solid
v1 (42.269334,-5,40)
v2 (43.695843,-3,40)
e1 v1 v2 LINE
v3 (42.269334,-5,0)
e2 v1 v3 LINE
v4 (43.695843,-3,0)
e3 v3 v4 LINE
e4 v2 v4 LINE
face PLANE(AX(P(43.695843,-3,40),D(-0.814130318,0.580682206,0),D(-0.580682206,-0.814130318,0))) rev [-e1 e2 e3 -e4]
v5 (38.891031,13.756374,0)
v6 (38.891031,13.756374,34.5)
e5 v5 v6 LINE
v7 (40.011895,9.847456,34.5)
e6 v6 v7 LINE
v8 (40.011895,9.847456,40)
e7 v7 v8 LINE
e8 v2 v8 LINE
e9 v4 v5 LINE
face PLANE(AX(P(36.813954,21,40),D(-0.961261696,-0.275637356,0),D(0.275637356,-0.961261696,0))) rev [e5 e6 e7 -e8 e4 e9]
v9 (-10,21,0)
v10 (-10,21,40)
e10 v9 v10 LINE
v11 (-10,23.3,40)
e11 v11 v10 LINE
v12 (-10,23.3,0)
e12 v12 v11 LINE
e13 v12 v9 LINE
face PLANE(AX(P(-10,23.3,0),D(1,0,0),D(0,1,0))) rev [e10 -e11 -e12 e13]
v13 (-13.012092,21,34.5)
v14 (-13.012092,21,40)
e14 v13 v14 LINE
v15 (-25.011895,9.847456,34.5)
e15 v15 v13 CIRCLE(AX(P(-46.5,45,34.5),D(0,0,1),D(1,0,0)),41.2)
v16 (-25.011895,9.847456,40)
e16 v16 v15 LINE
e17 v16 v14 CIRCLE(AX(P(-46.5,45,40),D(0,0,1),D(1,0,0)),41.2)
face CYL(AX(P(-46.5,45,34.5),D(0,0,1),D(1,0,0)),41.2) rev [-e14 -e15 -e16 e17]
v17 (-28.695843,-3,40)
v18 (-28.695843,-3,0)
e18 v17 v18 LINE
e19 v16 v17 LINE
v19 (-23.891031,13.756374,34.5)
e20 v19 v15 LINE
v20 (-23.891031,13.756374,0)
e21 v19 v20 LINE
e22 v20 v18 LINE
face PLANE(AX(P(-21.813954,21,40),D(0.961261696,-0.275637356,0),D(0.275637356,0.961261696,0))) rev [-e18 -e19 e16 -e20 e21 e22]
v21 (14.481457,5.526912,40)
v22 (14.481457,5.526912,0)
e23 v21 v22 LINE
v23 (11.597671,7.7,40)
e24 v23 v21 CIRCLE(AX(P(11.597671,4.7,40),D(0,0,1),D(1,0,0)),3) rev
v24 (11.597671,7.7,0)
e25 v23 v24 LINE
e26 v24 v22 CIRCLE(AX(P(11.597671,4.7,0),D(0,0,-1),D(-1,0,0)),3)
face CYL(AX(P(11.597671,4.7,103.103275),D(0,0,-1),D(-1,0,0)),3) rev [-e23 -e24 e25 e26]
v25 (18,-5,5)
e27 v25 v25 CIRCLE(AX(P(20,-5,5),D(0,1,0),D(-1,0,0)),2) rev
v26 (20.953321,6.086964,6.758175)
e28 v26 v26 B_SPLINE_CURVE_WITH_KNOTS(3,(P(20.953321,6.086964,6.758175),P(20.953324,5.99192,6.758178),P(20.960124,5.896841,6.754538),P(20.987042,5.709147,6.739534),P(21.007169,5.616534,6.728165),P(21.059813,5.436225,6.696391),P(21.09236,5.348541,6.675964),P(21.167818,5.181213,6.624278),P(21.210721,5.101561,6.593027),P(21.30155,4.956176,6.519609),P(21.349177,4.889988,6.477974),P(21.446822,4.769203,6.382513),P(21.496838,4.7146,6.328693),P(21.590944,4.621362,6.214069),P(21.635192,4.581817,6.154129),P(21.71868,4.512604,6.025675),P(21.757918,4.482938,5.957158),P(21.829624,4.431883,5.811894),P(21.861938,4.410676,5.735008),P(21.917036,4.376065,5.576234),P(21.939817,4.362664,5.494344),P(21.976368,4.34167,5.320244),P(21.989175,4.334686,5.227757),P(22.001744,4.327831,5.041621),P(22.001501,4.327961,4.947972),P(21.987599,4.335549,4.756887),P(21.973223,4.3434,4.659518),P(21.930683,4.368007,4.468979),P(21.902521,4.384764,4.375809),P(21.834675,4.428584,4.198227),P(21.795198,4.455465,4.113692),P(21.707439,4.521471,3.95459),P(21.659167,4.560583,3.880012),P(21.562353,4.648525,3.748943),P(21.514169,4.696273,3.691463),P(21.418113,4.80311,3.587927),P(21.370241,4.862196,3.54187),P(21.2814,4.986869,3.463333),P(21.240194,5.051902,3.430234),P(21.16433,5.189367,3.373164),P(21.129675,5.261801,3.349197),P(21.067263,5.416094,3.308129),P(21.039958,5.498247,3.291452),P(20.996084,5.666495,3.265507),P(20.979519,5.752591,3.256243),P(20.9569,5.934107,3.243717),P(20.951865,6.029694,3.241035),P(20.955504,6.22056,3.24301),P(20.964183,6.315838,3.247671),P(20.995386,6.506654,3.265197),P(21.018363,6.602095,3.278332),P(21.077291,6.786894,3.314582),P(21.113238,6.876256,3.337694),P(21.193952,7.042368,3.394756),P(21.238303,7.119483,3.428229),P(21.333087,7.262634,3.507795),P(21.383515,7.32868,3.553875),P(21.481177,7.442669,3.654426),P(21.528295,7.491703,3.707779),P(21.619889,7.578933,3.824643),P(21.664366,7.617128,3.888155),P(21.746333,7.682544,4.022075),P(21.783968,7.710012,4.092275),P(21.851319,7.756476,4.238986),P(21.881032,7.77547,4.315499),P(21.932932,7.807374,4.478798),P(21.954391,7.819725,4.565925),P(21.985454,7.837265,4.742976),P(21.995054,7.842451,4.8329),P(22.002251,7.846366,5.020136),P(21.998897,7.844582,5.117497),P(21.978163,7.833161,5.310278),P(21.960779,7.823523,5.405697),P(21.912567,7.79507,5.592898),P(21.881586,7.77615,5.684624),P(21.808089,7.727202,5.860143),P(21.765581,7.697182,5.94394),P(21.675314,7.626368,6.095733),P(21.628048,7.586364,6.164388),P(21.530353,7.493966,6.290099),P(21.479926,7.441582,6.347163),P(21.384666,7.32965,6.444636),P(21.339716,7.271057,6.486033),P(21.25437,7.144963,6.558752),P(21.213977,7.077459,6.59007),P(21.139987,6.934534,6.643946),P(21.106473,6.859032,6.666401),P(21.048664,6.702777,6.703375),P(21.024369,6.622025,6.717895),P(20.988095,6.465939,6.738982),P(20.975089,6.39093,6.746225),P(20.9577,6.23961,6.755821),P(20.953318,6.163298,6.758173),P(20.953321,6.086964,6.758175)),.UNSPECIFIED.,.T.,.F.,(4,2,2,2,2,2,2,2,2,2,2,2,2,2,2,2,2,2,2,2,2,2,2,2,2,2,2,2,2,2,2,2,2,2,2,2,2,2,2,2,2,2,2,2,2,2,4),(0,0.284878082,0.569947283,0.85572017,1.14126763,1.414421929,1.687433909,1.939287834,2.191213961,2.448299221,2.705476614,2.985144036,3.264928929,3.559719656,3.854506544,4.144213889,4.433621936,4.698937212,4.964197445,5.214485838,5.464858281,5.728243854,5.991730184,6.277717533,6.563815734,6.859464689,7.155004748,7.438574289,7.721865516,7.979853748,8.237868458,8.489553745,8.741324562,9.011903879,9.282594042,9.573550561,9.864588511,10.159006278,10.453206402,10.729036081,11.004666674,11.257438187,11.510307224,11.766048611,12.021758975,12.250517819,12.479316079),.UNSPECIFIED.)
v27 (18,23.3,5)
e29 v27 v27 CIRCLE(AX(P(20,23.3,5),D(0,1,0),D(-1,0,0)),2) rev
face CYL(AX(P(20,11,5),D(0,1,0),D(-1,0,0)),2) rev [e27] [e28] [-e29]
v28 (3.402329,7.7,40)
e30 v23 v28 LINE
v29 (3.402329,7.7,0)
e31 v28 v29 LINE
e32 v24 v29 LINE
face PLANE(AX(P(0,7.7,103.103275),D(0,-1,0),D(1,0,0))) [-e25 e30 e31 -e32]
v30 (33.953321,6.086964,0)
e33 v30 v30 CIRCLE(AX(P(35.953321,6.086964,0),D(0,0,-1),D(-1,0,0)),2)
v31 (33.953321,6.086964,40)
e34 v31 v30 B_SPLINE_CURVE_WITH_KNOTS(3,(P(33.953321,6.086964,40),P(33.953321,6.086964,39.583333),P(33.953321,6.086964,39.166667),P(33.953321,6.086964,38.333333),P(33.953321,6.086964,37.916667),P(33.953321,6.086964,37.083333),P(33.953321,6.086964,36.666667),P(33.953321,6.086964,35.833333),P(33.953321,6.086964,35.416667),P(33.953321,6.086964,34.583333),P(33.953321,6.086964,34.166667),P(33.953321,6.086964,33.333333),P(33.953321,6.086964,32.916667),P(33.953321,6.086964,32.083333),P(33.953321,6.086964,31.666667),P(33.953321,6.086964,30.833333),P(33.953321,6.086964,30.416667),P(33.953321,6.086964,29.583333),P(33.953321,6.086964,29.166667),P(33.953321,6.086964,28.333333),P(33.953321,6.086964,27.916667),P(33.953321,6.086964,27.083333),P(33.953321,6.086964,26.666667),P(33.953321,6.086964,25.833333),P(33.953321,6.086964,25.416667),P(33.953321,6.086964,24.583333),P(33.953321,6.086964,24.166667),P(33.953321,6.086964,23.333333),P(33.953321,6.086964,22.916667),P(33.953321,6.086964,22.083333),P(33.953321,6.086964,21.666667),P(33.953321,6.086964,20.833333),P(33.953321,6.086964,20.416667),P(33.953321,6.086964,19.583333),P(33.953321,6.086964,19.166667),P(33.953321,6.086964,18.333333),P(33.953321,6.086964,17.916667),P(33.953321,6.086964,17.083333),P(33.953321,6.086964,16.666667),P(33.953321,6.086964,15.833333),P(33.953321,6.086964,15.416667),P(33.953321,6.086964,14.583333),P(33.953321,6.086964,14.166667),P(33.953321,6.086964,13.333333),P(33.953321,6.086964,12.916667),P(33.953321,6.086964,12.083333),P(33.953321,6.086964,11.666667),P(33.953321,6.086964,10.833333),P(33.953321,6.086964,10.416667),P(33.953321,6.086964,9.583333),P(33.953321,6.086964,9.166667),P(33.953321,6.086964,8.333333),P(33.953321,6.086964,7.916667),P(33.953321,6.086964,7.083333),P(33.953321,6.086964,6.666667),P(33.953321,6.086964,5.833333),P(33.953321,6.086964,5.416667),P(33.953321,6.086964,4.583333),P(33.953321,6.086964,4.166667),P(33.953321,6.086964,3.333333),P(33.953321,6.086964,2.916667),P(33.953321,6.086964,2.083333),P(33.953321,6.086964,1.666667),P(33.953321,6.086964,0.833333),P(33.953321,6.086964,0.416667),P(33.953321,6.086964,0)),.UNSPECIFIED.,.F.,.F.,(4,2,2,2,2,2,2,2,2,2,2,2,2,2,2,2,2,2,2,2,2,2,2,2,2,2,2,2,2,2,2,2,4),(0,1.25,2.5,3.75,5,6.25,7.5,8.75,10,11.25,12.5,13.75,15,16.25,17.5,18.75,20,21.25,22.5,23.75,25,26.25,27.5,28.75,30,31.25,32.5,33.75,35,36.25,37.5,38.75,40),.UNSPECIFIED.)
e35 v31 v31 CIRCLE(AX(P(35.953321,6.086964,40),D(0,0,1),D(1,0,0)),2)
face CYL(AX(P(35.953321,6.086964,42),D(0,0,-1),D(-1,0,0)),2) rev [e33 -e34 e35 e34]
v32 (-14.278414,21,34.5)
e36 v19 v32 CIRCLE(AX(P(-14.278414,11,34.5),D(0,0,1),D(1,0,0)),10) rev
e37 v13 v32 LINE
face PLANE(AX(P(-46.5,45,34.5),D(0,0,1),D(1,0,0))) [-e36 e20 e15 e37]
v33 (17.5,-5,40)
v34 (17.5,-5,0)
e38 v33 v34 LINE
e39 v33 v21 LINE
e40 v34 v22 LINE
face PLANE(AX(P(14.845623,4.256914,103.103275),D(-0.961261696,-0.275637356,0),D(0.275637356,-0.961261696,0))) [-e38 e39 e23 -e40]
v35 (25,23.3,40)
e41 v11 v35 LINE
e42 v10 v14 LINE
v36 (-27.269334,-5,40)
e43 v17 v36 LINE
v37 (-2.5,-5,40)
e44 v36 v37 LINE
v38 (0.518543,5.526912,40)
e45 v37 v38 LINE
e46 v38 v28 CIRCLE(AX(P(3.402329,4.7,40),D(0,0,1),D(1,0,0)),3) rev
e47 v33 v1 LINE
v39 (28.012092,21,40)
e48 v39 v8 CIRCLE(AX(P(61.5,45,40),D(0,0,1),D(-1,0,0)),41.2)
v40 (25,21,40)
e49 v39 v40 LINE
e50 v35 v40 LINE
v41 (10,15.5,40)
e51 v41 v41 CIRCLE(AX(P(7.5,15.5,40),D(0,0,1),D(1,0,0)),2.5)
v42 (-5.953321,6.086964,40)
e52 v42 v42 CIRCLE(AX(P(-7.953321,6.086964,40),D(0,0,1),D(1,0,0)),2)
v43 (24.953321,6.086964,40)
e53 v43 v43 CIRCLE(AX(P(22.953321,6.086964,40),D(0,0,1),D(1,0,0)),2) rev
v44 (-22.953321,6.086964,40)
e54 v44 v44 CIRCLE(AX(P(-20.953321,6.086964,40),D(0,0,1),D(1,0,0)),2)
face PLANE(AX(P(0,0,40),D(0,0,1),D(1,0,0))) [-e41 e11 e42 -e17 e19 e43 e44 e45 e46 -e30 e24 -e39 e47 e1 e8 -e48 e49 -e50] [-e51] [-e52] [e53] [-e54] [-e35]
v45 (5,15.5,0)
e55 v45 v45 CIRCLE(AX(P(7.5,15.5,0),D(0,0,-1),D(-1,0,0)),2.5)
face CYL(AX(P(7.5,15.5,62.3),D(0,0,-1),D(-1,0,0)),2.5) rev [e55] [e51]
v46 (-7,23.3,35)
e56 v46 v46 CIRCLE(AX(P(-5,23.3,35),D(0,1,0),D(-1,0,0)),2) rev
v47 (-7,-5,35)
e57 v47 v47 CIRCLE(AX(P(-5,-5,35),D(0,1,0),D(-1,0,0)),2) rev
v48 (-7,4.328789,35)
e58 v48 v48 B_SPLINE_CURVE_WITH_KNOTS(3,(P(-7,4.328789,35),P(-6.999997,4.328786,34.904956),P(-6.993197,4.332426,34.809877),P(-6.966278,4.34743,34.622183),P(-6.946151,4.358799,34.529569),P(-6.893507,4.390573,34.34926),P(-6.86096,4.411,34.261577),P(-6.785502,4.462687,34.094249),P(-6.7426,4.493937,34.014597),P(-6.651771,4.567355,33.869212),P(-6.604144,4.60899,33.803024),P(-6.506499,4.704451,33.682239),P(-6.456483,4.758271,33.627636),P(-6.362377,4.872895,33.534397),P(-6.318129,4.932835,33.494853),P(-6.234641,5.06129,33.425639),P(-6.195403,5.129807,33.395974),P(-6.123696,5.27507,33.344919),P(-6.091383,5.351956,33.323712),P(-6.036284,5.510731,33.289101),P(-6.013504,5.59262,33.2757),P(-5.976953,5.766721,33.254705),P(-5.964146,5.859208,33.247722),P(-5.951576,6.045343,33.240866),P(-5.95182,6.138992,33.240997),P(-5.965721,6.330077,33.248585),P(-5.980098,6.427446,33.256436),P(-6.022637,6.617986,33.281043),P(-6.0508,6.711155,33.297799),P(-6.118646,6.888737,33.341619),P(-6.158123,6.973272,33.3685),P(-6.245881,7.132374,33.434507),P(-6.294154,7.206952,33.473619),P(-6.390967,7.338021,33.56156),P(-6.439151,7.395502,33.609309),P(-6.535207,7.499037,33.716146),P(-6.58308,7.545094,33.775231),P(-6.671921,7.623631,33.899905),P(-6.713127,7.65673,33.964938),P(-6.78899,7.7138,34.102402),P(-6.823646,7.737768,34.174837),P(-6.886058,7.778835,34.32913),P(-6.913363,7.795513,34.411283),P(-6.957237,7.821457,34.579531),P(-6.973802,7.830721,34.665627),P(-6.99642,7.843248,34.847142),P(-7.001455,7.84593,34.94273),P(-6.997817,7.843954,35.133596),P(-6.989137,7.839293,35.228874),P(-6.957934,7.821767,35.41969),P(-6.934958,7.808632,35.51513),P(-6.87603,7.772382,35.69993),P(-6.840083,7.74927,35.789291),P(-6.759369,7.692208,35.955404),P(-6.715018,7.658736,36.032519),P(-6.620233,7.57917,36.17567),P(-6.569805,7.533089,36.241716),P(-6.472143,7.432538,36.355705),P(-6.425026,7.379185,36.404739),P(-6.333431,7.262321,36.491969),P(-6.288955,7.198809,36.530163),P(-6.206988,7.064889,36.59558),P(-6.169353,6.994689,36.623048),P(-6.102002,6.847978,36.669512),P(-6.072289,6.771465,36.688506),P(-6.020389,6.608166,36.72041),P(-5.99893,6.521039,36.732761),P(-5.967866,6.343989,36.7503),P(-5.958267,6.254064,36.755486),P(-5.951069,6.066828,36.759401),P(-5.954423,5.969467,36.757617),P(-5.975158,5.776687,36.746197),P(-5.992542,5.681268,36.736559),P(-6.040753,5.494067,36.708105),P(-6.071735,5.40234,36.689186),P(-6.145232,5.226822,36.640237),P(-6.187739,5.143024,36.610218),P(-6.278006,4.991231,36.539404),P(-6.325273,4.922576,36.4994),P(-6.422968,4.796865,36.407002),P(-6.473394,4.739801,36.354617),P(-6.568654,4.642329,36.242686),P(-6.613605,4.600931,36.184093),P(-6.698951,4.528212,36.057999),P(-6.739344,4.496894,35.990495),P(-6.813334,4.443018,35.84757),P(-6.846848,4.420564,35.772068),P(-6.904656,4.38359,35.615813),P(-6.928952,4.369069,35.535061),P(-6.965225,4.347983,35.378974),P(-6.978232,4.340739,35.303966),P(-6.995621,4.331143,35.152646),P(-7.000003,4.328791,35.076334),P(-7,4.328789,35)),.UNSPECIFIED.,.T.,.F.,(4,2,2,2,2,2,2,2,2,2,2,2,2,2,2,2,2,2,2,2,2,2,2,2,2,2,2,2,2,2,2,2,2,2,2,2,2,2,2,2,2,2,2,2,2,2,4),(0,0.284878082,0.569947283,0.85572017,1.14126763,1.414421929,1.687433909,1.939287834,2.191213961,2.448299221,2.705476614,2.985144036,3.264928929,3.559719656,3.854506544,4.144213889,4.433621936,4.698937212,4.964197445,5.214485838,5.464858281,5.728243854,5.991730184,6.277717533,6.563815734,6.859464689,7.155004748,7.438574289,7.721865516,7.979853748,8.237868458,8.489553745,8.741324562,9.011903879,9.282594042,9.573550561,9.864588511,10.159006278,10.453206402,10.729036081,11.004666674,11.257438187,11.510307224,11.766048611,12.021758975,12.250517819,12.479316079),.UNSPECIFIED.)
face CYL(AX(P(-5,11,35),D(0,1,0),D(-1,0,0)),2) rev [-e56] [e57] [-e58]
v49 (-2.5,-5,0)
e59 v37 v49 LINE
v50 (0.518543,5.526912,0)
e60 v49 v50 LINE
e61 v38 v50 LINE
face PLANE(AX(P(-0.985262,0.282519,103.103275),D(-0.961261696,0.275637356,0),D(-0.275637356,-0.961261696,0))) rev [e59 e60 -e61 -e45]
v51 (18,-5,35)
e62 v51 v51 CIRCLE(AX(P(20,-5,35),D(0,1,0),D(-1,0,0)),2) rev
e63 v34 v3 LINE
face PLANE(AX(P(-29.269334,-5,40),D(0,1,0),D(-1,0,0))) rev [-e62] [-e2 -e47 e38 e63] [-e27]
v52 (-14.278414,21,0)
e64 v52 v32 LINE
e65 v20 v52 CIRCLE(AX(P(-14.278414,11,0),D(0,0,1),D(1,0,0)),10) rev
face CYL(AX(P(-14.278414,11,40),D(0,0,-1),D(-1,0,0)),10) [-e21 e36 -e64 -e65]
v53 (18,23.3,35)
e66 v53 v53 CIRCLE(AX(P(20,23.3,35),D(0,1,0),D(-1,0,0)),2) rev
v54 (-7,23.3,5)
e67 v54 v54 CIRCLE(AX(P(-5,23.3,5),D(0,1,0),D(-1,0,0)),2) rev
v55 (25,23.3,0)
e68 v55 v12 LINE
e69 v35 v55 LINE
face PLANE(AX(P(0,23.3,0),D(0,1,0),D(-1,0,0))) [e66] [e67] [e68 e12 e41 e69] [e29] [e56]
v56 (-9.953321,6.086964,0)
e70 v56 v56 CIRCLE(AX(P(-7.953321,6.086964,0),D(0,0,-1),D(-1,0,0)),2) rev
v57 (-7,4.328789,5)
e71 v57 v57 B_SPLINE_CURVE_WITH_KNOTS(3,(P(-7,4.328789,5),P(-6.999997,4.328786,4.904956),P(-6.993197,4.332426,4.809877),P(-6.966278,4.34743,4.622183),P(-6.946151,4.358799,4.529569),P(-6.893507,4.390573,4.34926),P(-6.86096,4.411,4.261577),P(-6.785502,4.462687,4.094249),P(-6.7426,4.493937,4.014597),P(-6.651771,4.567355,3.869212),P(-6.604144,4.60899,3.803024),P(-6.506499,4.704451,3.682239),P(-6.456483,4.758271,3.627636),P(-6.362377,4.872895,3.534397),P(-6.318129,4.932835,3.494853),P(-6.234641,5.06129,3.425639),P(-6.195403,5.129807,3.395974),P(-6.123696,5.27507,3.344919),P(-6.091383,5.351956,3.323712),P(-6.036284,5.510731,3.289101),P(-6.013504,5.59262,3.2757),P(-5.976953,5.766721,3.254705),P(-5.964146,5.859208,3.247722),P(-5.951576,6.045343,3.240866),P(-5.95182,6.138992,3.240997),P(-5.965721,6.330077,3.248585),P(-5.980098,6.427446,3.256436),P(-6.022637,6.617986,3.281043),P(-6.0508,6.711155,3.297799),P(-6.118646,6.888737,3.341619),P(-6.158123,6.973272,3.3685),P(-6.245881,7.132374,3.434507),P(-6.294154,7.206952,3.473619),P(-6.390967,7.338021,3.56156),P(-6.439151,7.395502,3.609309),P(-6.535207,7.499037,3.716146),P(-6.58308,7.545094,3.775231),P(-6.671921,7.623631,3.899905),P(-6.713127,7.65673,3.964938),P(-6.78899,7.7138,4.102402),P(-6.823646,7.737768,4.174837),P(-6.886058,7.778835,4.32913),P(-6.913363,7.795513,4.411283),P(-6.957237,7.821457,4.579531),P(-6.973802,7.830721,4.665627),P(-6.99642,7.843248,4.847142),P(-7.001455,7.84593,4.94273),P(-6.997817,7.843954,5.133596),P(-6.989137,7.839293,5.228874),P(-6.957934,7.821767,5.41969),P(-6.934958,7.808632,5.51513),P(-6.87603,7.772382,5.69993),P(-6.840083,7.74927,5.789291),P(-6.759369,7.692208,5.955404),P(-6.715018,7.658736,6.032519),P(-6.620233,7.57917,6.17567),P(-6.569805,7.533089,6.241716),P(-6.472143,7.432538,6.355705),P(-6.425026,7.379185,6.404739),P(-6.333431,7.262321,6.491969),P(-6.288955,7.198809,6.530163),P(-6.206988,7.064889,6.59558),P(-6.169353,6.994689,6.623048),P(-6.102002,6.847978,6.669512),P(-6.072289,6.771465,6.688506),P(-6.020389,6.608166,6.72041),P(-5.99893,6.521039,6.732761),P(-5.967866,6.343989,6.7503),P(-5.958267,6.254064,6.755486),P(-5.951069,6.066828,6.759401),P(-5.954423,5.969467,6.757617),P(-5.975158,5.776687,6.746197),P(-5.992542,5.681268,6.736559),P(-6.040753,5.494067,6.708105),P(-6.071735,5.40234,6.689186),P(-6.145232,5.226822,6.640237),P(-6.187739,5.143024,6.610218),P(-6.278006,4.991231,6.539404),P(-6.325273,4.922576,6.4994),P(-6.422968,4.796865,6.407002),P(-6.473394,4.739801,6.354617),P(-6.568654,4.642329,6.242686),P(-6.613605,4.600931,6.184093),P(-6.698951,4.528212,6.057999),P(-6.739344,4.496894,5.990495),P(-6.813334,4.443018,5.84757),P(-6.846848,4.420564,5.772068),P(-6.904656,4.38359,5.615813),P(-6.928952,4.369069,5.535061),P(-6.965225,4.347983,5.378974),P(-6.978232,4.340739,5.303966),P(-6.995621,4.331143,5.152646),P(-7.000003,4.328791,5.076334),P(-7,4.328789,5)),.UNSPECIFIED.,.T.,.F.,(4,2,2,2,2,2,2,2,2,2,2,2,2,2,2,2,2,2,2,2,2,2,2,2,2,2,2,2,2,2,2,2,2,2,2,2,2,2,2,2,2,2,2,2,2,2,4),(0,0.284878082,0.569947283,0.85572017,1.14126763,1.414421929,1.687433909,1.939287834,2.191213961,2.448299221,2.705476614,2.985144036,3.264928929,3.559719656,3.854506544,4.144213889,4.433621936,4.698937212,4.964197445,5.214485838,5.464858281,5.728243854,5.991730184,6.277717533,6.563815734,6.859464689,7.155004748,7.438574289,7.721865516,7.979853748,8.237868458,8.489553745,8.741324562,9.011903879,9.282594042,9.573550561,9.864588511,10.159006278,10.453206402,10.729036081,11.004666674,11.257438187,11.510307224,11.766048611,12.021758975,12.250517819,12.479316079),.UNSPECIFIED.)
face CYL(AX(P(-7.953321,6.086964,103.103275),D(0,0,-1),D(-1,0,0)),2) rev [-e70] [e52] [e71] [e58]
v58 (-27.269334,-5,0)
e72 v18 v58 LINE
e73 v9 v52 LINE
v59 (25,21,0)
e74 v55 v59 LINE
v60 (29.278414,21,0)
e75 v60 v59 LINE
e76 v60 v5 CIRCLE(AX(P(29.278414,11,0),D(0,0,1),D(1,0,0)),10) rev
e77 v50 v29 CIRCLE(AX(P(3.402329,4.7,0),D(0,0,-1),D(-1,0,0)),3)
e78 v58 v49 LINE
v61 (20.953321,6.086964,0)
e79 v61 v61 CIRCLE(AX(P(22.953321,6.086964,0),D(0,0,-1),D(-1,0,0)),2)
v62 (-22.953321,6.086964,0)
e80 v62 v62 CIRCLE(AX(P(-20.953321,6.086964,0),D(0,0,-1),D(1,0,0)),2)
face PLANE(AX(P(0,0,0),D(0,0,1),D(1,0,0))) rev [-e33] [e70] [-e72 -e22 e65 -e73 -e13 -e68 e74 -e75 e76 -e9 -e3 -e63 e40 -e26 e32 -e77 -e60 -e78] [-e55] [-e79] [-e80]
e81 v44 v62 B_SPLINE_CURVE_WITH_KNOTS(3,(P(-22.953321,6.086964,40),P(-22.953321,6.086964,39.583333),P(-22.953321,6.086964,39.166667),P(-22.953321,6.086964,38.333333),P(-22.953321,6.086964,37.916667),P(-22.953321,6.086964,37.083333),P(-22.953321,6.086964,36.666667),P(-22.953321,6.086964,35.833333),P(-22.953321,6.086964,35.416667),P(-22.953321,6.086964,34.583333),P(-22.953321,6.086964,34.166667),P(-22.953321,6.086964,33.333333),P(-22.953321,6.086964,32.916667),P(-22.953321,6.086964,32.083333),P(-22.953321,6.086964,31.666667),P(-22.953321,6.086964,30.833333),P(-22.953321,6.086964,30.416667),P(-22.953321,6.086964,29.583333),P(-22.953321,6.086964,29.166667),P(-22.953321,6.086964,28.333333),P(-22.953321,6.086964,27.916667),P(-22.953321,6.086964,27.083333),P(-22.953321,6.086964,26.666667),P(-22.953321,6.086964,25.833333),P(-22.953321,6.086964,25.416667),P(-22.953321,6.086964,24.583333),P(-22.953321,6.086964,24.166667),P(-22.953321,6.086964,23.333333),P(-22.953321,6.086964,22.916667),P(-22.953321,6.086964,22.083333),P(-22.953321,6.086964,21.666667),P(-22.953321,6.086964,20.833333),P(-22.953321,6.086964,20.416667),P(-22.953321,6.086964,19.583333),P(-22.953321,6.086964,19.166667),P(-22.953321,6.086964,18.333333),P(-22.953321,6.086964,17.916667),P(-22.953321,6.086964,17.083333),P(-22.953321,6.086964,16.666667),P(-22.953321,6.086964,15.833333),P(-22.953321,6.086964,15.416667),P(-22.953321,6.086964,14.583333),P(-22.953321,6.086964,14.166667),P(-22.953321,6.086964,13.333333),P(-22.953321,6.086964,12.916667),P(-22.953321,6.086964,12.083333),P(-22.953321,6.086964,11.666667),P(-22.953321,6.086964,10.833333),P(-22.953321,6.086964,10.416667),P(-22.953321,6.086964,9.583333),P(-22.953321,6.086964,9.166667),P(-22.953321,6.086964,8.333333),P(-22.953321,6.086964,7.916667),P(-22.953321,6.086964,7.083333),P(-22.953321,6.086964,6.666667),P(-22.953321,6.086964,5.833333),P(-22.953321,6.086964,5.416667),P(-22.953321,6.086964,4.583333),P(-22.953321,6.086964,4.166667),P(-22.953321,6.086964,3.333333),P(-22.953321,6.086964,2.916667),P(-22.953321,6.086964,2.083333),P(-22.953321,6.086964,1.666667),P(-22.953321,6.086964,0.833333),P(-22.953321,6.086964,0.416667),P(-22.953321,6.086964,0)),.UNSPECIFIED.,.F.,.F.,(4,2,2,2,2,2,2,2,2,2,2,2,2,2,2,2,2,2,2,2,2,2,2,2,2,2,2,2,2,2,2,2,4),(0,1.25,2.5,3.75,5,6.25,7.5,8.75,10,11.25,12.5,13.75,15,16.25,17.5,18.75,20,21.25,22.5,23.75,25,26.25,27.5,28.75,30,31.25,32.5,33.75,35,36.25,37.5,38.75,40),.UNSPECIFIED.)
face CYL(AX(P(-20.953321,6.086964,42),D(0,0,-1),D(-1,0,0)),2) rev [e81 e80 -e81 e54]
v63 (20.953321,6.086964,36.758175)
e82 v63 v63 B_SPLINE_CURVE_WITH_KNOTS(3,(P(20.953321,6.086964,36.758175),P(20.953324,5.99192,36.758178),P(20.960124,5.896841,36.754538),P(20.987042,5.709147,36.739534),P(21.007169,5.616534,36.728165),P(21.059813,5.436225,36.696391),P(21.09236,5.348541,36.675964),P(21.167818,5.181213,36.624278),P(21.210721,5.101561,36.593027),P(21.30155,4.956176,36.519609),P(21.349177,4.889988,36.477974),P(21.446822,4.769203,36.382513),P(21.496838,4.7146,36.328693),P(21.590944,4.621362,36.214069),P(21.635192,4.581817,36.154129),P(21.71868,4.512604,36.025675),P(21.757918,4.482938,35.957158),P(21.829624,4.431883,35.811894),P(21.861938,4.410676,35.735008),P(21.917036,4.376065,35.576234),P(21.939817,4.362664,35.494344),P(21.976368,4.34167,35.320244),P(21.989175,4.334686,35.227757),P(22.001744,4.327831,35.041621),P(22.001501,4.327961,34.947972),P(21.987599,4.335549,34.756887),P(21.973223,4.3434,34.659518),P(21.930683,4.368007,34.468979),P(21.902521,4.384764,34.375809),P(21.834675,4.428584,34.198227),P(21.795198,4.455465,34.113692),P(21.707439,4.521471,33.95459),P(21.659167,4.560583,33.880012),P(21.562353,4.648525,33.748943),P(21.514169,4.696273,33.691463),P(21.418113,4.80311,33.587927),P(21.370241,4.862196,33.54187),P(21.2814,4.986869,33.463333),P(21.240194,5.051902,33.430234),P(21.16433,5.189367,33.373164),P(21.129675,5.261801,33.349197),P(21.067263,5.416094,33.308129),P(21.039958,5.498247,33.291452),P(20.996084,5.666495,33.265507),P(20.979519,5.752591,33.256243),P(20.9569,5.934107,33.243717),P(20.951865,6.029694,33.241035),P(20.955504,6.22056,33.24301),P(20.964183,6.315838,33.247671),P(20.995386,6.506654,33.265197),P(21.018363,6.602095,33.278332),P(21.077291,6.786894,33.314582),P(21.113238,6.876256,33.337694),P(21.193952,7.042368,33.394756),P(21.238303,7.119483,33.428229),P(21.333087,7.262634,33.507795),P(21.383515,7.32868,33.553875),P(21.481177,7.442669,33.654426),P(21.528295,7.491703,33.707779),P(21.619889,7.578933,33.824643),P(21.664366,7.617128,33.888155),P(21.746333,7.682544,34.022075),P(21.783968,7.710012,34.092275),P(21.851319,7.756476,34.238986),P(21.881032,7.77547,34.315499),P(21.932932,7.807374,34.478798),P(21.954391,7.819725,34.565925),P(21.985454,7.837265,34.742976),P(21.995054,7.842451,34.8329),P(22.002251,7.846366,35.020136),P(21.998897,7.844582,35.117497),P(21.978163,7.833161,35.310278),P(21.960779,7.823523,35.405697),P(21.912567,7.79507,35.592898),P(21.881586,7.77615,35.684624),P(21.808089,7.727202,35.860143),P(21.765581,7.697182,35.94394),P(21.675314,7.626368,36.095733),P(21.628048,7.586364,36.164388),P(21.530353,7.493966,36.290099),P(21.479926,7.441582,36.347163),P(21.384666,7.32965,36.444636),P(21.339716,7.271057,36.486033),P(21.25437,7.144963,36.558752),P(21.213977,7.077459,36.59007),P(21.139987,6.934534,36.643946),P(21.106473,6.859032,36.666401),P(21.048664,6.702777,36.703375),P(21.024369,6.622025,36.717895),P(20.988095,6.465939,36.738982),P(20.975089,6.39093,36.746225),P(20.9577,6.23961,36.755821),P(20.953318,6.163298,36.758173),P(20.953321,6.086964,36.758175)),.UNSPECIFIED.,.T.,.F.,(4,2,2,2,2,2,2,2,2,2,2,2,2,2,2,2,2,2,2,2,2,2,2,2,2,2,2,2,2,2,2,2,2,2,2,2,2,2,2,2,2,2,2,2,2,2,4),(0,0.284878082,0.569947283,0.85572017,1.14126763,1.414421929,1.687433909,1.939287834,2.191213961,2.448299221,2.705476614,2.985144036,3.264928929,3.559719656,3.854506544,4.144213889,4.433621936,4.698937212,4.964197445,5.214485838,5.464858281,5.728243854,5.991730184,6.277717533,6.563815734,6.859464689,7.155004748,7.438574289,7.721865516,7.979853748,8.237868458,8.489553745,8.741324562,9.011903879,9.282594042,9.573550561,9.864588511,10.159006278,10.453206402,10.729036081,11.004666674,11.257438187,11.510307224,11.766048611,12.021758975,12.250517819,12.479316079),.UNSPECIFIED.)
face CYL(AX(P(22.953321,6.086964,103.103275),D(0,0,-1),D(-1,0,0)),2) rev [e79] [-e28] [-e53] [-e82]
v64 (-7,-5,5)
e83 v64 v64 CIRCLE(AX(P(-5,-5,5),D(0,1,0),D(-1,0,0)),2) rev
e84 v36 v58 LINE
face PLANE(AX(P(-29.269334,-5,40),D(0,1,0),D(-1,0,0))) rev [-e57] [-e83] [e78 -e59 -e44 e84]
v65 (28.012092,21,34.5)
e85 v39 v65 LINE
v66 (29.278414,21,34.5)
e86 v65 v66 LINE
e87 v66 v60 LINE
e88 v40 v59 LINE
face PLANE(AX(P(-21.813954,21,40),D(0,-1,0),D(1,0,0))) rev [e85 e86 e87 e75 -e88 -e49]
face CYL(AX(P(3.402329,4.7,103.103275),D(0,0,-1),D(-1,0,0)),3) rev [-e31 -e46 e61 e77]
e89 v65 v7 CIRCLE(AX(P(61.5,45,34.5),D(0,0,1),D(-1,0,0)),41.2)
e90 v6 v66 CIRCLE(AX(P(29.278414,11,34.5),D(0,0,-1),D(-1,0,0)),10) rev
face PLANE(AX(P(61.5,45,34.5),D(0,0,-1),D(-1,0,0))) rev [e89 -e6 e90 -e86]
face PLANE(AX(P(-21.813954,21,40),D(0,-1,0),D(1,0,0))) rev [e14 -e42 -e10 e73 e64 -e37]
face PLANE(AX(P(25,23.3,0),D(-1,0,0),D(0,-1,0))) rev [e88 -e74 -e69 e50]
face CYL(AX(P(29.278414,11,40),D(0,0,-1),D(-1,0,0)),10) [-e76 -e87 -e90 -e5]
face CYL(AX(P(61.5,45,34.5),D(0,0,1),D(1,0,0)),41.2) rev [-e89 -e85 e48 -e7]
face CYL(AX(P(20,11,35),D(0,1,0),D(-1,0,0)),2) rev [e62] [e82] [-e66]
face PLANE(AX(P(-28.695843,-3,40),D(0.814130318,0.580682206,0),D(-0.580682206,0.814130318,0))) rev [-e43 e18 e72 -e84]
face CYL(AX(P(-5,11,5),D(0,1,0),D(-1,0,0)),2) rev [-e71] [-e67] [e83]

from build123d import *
from build123d.topology import SkipClean

# Parameters (mm, degrees)
SKETCH_1_R              = 2.4
SKETCH_1_R_2            = 6.5
EXTRUDE_1_DEPTH         = 40
FILLET_1_R              = 10
SKETCH_2_R              = 2.4
CUT_EXTRUDE_1_DEPTH     = 66.0828238
SKETCH_4_R              = 41.2
CUT_EXTRUDE_2_DEPTH     = 5.5
CUT_EXTRUDE_3_DEPTH     = 64.25167155
SKETCH_6_W              = 35.436929204
SKETCH_6_H              = 26
EXTRUDE_2_DEPTH         = 40
CUT_EXTRUDE_4_DEPTH     = 42
EXTRUDE_START           = -40
EXTRUDE_3_DEPTH         = 40
SKETCH_9_R              = 2
CUT_EXTRUDE_5_DEPTH     = 42
SKETCH_13_R             = 2
CUT_EXTRUDE_6_DEPTH     = 10
SKETCH_14_R             = 2
EXTRUDE_4_DEPTH         = 40
EXTRUDE_START_2         = 2.3
SKETCH_15_W             = 35
SKETCH_15_H             = 40
SKETCH_15_R             = 2
EXTRUDE_5_DEPTH         = 2.3
SKETCH_16_R             = 2.5
CUT_EXTRUDE_7_DEPTH     = 62.3
CUT_EXTRUDE_START       = -26
CUT_EXTRUDE_8_OUTLINE_R = 2
CUT_EXTRUDE_8_DEPTH     = 19.5


# Read off the part's stored shape, not the designer's step: 切除-拉伸8
with BuildPart() as part:
    # 草图1 → 凸台-拉伸1 (new body)
    with BuildSketch(Plane.XY):
        Polygon((-29.269334238, -5), (44.269334238, -5), (36.813954208, 21), (-21.813954208, 21), align=None)
        with Locations((15, 17)):
            Circle(SKETCH_1_R, mode=Mode.SUBTRACT)
        with Locations((15, 0)):
            Circle(SKETCH_1_R, mode=Mode.SUBTRACT)
        Circle(SKETCH_1_R, mode=Mode.SUBTRACT)
        with Locations((0, 17)):
            Circle(SKETCH_1_R, mode=Mode.SUBTRACT)
        with Locations((7.5, 8)):
            Circle(SKETCH_1_R_2, mode=Mode.SUBTRACT)
    extrude(amount=EXTRUDE_1_DEPTH)

    # 圆角1
    fillet_1_edges = [part.edges().sort_by_distance(p)[0] for p in [
        (-21.813954208, 21, 20),
        (36.813954208, 21, 20),
    ]]
    fillet(fillet_1_edges, radius=FILLET_1_R)

    # 草图2 → 切除-拉伸1 (cut, through all)
    with BuildSketch(Plane(origin=(0, 21, 0), x_dir=(1, 0, 0), z_dir=(0, 1, 0))):
        with Locations(Location((-5, -5, 0), (0, 0, 180))):
            Circle(SKETCH_2_R)
        with Locations(Location((20, -5, 0), (0, 0, 180))):
            Circle(SKETCH_2_R)
        with Locations(Location((-5, -35, 0), (0, 0, 180))):
            Circle(SKETCH_2_R)
        with Locations(Location((20, -35, 0), (0, 0, 180))):
            Circle(SKETCH_2_R)
    extrude(amount=-CUT_EXTRUDE_1_DEPTH, mode=Mode.SUBTRACT)

    # 草图4 → 切除-拉伸2 (cut)
    with BuildSketch(Plane.XY.offset(40)):
        with Locations((-46.5, 45)):
            Circle(SKETCH_4_R)
        with Locations((61.5, 45)):
            Circle(SKETCH_4_R)
    extrude(amount=-CUT_EXTRUDE_2_DEPTH, mode=Mode.SUBTRACT)

    # 草图5 → 切除-拉伸3 (cut, through all)
    with BuildSketch(Plane(origin=(0, 0, 0), x_dir=(-1, 0, 0), z_dir=(0, 0, -1))):
        Polygon((-42.269334238, -5), (-44.269334238, -5), (-43.695843466, -3), align=None)
        Polygon((28.695843466, -3), (27.269334238, -5), (29.269334238, -5), align=None)
    extrude(amount=-CUT_EXTRUDE_3_DEPTH, mode=Mode.SUBTRACT)

    # 草图6 → 凸台-拉伸2 (add)
    with BuildSketch(Plane.XY.offset(40)):
        with Locations((7.60959875, 8)):
            Rectangle(SKETCH_6_W, SKETCH_6_H)
    extrude(amount=-EXTRUDE_2_DEPTH)

    # 草图7 → 切除-拉伸4 (cut)
    with BuildSketch(Plane.XY.offset(40)):
        with BuildLine():
            Line((-22.507387905, -5), (37.507387905, -5))
            Line((37.507387905, -5), (35.643542897, 1.5))
            Line((35.643542897, 1.5), (34.432453611, 5.723570268))
            Line((34.432453611, 5.723570268), (33.76369363, 8.055813487))
            Line((33.76369363, 8.055813487), (32.642829643, 11.964730745))
            ThreePointArc((32.642829643, 11.964730745), (31.384766288, 13.795224285), (29.278413707, 14.5))
            Line((29.278413707, 14.5), (28.012091734, 14.5))
            Line((28.012091734, 14.5), (24.82521302, 14.5))
            Line((24.82521302, 14.5), (-9.82521302, 14.5))
            Line((-9.82521302, 14.5), (-13.012091734, 14.5))
            Line((-13.012091734, 14.5), (-14.278413707, 14.5))
            ThreePointArc((-14.278413707, 14.5), (-16.384766288, 13.795224285), (-17.642829643, 11.964730745))
            Line((-17.642829643, 11.964730745), (-18.76369363, 8.055813487))
            Line((-18.76369363, 8.055813487), (-19.432453611, 5.723570268))
            Line((-19.432453611, 5.723570268), (-20.643542897, 1.5))
            Line((-20.643542897, 1.5), (-22.507387905, -5))
        make_face()
    extrude(amount=-CUT_EXTRUDE_4_DEPTH, mode=Mode.SUBTRACT)

    # 草图8 → 凸台-拉伸3 (add)
    with BuildSketch(Plane(origin=(0, 0, 0), x_dir=(-1, 0, 0), z_dir=(0, 0, -1)).offset(EXTRUDE_START)):
        with BuildLine():
            Line((-32.642829643, 11.964730745), (-36.218494875, -0.505095833))
            ThreePointArc((-36.218494875, -0.505095833), (-31.672508019, 1.693488789), (-29.830249532, 6.395175135))
            ThreePointArc((-29.830249532, 6.395175135), (-30.573281352, 9.514892934), (-32.642829643, 11.964730745))
        make_face()
        with BuildLine():
            ThreePointArc((17.642829643, 11.964730745), (15.098349227, 4.487546685), (21.218494875, -0.505095833))
            Line((21.218494875, -0.505095833), (17.642829643, 11.964730745))
        make_face()
    extrude(amount=EXTRUDE_3_DEPTH)

    # 草图9 → 切除-拉伸5 (cut)
    with BuildSketch(Plane(origin=(0, 0, 0), x_dir=(-1, 0, 0), z_dir=(0, 0, -1))):
        with Locations((-35.953320593, 6.086964229)):
            Circle(SKETCH_9_R)
        with Locations((20.953320593, 6.086964229)):
            Circle(SKETCH_9_R)
    extrude(amount=-CUT_EXTRUDE_5_DEPTH, mode=Mode.SUBTRACT)

    # 草图13 → 切除-拉伸6 (cut)
    with BuildSketch(Plane(origin=(0, 21, 0), x_dir=(1, 0, 0), z_dir=(0, 1, 0))):
        with Locations(Location((20, -35, 0), (0, 0, 180))):
            Circle(SKETCH_13_R)
        with Locations(Location((-5, -35, 0), (0, 0, 180))):
            Circle(SKETCH_13_R)
        with Locations(Location((-5, -5, 0), (0, 0, 180))):
            Circle(SKETCH_13_R)
        with Locations(Location((20, -5, 0), (0, 0, 180))):
            Circle(SKETCH_13_R)
    extrude(amount=-CUT_EXTRUDE_6_DEPTH, mode=Mode.SUBTRACT)

    # 草图14 → 凸台-拉伸4 (add)
    with BuildSketch(Plane(origin=(0, 0, 0), x_dir=(-1, 0, 0), z_dir=(0, 0, -1)).offset(EXTRUDE_START)):
        with BuildLine():
            Line((-36.218494875, -0.505095833), (-37.507387905, -5))
            Line((-37.507387905, -5), (-17.5, -5))
            Line((-17.5, -5), (-14.481456538, 5.526912067))
            ThreePointArc((-14.481456538, 5.526912067), (-13.40311652, 7.09590653), (-11.597671451, 7.7))
            Line((-11.597671451, 7.7), (-7.5, 7.7))
            Line((-7.5, 7.7), (-3.402328549, 7.7))
            ThreePointArc((-3.402328549, 7.7), (-1.59688348, 7.09590653), (-0.518543462, 5.526912067))
            Line((-0.518543462, 5.526912067), (2.5, -5))
            Line((2.5, -5), (22.507387905, -5))
            Line((22.507387905, -5), (21.218494875, -0.505095833))
            ThreePointArc((21.218494875, -0.505095833), (15.098349227, 4.487546685), (17.642829643, 11.964730745))
            ThreePointArc((17.642829643, 11.964730745), (16.384766288, 13.795224285), (14.278413707, 14.5))
            Line((14.278413707, 14.5), (-29.278413707, 14.5))
            ThreePointArc((-29.278413707, 14.5), (-31.384766288, 13.795224285), (-32.642829643, 11.964730745))
            ThreePointArc((-32.642829643, 11.964730745), (-30.098349227, 4.487546685), (-36.218494875, -0.505095833))
        make_face()
        with Locations((-22.953320593, 6.086964229)):
            Circle(SKETCH_14_R, mode=Mode.SUBTRACT)
        with Locations((7.953320593, 6.086964229)):
            Circle(SKETCH_14_R, mode=Mode.SUBTRACT)
    extrude(amount=EXTRUDE_4_DEPTH)

    # 草图15 → 凸台-拉伸5 (add)
    with BuildSketch(Plane(origin=(0, 21, 0), x_dir=(1, 0, 0), z_dir=(0, 1, 0)).offset(EXTRUDE_START_2)):
        with Locations((7.5, -20)):
            Rectangle(SKETCH_15_W, SKETCH_15_H)
        with Locations(Location((-5, -35, 0), (0, 0, 180))):
            Circle(SKETCH_15_R, mode=Mode.SUBTRACT)
        with Locations(Location((20, -35, 0), (0, 0, 180))):
            Circle(SKETCH_15_R, mode=Mode.SUBTRACT)
        with Locations(Location((-5, -5, 0), (0, 0, 180))):
            Circle(SKETCH_15_R, mode=Mode.SUBTRACT)
        with Locations(Location((20, -5, 0), (0, 0, 180))):
            Circle(SKETCH_15_R, mode=Mode.SUBTRACT)
    extrude(amount=-EXTRUDE_5_DEPTH)

    # 草图16 → 切除-拉伸7 (cut)
    with BuildSketch(Plane(origin=(0, 0, 0), x_dir=(-1, 0, 0), z_dir=(0, 0, -1))):
        with Locations((-7.5, 15.5)):
            Circle(SKETCH_16_R)
    extrude(amount=-CUT_EXTRUDE_7_DEPTH, mode=Mode.SUBTRACT)

    # 切除-拉伸8 outline → 切除-拉伸8 (cut)
    with SkipClean():  # the faces are left unmerged after this step: merging them gives an invalid solid
        with BuildSketch(Plane(origin=(0, 21, 0), x_dir=(1, 0, 0), z_dir=(0, 1, 0)).offset(CUT_EXTRUDE_START)):
            with Locations((-5, -5)):
                Circle(CUT_EXTRUDE_8_OUTLINE_R)
            with Locations((-5, -35)):
                Circle(CUT_EXTRUDE_8_OUTLINE_R)
            with Locations((20, -35)):
                Circle(CUT_EXTRUDE_8_OUTLINE_R)
            with Locations((20, -5)):
                Circle(CUT_EXTRUDE_8_OUTLINE_R)
        extrude(amount=CUT_EXTRUDE_8_DEPTH, mode=Mode.SUBTRACT)


solid = part.part
